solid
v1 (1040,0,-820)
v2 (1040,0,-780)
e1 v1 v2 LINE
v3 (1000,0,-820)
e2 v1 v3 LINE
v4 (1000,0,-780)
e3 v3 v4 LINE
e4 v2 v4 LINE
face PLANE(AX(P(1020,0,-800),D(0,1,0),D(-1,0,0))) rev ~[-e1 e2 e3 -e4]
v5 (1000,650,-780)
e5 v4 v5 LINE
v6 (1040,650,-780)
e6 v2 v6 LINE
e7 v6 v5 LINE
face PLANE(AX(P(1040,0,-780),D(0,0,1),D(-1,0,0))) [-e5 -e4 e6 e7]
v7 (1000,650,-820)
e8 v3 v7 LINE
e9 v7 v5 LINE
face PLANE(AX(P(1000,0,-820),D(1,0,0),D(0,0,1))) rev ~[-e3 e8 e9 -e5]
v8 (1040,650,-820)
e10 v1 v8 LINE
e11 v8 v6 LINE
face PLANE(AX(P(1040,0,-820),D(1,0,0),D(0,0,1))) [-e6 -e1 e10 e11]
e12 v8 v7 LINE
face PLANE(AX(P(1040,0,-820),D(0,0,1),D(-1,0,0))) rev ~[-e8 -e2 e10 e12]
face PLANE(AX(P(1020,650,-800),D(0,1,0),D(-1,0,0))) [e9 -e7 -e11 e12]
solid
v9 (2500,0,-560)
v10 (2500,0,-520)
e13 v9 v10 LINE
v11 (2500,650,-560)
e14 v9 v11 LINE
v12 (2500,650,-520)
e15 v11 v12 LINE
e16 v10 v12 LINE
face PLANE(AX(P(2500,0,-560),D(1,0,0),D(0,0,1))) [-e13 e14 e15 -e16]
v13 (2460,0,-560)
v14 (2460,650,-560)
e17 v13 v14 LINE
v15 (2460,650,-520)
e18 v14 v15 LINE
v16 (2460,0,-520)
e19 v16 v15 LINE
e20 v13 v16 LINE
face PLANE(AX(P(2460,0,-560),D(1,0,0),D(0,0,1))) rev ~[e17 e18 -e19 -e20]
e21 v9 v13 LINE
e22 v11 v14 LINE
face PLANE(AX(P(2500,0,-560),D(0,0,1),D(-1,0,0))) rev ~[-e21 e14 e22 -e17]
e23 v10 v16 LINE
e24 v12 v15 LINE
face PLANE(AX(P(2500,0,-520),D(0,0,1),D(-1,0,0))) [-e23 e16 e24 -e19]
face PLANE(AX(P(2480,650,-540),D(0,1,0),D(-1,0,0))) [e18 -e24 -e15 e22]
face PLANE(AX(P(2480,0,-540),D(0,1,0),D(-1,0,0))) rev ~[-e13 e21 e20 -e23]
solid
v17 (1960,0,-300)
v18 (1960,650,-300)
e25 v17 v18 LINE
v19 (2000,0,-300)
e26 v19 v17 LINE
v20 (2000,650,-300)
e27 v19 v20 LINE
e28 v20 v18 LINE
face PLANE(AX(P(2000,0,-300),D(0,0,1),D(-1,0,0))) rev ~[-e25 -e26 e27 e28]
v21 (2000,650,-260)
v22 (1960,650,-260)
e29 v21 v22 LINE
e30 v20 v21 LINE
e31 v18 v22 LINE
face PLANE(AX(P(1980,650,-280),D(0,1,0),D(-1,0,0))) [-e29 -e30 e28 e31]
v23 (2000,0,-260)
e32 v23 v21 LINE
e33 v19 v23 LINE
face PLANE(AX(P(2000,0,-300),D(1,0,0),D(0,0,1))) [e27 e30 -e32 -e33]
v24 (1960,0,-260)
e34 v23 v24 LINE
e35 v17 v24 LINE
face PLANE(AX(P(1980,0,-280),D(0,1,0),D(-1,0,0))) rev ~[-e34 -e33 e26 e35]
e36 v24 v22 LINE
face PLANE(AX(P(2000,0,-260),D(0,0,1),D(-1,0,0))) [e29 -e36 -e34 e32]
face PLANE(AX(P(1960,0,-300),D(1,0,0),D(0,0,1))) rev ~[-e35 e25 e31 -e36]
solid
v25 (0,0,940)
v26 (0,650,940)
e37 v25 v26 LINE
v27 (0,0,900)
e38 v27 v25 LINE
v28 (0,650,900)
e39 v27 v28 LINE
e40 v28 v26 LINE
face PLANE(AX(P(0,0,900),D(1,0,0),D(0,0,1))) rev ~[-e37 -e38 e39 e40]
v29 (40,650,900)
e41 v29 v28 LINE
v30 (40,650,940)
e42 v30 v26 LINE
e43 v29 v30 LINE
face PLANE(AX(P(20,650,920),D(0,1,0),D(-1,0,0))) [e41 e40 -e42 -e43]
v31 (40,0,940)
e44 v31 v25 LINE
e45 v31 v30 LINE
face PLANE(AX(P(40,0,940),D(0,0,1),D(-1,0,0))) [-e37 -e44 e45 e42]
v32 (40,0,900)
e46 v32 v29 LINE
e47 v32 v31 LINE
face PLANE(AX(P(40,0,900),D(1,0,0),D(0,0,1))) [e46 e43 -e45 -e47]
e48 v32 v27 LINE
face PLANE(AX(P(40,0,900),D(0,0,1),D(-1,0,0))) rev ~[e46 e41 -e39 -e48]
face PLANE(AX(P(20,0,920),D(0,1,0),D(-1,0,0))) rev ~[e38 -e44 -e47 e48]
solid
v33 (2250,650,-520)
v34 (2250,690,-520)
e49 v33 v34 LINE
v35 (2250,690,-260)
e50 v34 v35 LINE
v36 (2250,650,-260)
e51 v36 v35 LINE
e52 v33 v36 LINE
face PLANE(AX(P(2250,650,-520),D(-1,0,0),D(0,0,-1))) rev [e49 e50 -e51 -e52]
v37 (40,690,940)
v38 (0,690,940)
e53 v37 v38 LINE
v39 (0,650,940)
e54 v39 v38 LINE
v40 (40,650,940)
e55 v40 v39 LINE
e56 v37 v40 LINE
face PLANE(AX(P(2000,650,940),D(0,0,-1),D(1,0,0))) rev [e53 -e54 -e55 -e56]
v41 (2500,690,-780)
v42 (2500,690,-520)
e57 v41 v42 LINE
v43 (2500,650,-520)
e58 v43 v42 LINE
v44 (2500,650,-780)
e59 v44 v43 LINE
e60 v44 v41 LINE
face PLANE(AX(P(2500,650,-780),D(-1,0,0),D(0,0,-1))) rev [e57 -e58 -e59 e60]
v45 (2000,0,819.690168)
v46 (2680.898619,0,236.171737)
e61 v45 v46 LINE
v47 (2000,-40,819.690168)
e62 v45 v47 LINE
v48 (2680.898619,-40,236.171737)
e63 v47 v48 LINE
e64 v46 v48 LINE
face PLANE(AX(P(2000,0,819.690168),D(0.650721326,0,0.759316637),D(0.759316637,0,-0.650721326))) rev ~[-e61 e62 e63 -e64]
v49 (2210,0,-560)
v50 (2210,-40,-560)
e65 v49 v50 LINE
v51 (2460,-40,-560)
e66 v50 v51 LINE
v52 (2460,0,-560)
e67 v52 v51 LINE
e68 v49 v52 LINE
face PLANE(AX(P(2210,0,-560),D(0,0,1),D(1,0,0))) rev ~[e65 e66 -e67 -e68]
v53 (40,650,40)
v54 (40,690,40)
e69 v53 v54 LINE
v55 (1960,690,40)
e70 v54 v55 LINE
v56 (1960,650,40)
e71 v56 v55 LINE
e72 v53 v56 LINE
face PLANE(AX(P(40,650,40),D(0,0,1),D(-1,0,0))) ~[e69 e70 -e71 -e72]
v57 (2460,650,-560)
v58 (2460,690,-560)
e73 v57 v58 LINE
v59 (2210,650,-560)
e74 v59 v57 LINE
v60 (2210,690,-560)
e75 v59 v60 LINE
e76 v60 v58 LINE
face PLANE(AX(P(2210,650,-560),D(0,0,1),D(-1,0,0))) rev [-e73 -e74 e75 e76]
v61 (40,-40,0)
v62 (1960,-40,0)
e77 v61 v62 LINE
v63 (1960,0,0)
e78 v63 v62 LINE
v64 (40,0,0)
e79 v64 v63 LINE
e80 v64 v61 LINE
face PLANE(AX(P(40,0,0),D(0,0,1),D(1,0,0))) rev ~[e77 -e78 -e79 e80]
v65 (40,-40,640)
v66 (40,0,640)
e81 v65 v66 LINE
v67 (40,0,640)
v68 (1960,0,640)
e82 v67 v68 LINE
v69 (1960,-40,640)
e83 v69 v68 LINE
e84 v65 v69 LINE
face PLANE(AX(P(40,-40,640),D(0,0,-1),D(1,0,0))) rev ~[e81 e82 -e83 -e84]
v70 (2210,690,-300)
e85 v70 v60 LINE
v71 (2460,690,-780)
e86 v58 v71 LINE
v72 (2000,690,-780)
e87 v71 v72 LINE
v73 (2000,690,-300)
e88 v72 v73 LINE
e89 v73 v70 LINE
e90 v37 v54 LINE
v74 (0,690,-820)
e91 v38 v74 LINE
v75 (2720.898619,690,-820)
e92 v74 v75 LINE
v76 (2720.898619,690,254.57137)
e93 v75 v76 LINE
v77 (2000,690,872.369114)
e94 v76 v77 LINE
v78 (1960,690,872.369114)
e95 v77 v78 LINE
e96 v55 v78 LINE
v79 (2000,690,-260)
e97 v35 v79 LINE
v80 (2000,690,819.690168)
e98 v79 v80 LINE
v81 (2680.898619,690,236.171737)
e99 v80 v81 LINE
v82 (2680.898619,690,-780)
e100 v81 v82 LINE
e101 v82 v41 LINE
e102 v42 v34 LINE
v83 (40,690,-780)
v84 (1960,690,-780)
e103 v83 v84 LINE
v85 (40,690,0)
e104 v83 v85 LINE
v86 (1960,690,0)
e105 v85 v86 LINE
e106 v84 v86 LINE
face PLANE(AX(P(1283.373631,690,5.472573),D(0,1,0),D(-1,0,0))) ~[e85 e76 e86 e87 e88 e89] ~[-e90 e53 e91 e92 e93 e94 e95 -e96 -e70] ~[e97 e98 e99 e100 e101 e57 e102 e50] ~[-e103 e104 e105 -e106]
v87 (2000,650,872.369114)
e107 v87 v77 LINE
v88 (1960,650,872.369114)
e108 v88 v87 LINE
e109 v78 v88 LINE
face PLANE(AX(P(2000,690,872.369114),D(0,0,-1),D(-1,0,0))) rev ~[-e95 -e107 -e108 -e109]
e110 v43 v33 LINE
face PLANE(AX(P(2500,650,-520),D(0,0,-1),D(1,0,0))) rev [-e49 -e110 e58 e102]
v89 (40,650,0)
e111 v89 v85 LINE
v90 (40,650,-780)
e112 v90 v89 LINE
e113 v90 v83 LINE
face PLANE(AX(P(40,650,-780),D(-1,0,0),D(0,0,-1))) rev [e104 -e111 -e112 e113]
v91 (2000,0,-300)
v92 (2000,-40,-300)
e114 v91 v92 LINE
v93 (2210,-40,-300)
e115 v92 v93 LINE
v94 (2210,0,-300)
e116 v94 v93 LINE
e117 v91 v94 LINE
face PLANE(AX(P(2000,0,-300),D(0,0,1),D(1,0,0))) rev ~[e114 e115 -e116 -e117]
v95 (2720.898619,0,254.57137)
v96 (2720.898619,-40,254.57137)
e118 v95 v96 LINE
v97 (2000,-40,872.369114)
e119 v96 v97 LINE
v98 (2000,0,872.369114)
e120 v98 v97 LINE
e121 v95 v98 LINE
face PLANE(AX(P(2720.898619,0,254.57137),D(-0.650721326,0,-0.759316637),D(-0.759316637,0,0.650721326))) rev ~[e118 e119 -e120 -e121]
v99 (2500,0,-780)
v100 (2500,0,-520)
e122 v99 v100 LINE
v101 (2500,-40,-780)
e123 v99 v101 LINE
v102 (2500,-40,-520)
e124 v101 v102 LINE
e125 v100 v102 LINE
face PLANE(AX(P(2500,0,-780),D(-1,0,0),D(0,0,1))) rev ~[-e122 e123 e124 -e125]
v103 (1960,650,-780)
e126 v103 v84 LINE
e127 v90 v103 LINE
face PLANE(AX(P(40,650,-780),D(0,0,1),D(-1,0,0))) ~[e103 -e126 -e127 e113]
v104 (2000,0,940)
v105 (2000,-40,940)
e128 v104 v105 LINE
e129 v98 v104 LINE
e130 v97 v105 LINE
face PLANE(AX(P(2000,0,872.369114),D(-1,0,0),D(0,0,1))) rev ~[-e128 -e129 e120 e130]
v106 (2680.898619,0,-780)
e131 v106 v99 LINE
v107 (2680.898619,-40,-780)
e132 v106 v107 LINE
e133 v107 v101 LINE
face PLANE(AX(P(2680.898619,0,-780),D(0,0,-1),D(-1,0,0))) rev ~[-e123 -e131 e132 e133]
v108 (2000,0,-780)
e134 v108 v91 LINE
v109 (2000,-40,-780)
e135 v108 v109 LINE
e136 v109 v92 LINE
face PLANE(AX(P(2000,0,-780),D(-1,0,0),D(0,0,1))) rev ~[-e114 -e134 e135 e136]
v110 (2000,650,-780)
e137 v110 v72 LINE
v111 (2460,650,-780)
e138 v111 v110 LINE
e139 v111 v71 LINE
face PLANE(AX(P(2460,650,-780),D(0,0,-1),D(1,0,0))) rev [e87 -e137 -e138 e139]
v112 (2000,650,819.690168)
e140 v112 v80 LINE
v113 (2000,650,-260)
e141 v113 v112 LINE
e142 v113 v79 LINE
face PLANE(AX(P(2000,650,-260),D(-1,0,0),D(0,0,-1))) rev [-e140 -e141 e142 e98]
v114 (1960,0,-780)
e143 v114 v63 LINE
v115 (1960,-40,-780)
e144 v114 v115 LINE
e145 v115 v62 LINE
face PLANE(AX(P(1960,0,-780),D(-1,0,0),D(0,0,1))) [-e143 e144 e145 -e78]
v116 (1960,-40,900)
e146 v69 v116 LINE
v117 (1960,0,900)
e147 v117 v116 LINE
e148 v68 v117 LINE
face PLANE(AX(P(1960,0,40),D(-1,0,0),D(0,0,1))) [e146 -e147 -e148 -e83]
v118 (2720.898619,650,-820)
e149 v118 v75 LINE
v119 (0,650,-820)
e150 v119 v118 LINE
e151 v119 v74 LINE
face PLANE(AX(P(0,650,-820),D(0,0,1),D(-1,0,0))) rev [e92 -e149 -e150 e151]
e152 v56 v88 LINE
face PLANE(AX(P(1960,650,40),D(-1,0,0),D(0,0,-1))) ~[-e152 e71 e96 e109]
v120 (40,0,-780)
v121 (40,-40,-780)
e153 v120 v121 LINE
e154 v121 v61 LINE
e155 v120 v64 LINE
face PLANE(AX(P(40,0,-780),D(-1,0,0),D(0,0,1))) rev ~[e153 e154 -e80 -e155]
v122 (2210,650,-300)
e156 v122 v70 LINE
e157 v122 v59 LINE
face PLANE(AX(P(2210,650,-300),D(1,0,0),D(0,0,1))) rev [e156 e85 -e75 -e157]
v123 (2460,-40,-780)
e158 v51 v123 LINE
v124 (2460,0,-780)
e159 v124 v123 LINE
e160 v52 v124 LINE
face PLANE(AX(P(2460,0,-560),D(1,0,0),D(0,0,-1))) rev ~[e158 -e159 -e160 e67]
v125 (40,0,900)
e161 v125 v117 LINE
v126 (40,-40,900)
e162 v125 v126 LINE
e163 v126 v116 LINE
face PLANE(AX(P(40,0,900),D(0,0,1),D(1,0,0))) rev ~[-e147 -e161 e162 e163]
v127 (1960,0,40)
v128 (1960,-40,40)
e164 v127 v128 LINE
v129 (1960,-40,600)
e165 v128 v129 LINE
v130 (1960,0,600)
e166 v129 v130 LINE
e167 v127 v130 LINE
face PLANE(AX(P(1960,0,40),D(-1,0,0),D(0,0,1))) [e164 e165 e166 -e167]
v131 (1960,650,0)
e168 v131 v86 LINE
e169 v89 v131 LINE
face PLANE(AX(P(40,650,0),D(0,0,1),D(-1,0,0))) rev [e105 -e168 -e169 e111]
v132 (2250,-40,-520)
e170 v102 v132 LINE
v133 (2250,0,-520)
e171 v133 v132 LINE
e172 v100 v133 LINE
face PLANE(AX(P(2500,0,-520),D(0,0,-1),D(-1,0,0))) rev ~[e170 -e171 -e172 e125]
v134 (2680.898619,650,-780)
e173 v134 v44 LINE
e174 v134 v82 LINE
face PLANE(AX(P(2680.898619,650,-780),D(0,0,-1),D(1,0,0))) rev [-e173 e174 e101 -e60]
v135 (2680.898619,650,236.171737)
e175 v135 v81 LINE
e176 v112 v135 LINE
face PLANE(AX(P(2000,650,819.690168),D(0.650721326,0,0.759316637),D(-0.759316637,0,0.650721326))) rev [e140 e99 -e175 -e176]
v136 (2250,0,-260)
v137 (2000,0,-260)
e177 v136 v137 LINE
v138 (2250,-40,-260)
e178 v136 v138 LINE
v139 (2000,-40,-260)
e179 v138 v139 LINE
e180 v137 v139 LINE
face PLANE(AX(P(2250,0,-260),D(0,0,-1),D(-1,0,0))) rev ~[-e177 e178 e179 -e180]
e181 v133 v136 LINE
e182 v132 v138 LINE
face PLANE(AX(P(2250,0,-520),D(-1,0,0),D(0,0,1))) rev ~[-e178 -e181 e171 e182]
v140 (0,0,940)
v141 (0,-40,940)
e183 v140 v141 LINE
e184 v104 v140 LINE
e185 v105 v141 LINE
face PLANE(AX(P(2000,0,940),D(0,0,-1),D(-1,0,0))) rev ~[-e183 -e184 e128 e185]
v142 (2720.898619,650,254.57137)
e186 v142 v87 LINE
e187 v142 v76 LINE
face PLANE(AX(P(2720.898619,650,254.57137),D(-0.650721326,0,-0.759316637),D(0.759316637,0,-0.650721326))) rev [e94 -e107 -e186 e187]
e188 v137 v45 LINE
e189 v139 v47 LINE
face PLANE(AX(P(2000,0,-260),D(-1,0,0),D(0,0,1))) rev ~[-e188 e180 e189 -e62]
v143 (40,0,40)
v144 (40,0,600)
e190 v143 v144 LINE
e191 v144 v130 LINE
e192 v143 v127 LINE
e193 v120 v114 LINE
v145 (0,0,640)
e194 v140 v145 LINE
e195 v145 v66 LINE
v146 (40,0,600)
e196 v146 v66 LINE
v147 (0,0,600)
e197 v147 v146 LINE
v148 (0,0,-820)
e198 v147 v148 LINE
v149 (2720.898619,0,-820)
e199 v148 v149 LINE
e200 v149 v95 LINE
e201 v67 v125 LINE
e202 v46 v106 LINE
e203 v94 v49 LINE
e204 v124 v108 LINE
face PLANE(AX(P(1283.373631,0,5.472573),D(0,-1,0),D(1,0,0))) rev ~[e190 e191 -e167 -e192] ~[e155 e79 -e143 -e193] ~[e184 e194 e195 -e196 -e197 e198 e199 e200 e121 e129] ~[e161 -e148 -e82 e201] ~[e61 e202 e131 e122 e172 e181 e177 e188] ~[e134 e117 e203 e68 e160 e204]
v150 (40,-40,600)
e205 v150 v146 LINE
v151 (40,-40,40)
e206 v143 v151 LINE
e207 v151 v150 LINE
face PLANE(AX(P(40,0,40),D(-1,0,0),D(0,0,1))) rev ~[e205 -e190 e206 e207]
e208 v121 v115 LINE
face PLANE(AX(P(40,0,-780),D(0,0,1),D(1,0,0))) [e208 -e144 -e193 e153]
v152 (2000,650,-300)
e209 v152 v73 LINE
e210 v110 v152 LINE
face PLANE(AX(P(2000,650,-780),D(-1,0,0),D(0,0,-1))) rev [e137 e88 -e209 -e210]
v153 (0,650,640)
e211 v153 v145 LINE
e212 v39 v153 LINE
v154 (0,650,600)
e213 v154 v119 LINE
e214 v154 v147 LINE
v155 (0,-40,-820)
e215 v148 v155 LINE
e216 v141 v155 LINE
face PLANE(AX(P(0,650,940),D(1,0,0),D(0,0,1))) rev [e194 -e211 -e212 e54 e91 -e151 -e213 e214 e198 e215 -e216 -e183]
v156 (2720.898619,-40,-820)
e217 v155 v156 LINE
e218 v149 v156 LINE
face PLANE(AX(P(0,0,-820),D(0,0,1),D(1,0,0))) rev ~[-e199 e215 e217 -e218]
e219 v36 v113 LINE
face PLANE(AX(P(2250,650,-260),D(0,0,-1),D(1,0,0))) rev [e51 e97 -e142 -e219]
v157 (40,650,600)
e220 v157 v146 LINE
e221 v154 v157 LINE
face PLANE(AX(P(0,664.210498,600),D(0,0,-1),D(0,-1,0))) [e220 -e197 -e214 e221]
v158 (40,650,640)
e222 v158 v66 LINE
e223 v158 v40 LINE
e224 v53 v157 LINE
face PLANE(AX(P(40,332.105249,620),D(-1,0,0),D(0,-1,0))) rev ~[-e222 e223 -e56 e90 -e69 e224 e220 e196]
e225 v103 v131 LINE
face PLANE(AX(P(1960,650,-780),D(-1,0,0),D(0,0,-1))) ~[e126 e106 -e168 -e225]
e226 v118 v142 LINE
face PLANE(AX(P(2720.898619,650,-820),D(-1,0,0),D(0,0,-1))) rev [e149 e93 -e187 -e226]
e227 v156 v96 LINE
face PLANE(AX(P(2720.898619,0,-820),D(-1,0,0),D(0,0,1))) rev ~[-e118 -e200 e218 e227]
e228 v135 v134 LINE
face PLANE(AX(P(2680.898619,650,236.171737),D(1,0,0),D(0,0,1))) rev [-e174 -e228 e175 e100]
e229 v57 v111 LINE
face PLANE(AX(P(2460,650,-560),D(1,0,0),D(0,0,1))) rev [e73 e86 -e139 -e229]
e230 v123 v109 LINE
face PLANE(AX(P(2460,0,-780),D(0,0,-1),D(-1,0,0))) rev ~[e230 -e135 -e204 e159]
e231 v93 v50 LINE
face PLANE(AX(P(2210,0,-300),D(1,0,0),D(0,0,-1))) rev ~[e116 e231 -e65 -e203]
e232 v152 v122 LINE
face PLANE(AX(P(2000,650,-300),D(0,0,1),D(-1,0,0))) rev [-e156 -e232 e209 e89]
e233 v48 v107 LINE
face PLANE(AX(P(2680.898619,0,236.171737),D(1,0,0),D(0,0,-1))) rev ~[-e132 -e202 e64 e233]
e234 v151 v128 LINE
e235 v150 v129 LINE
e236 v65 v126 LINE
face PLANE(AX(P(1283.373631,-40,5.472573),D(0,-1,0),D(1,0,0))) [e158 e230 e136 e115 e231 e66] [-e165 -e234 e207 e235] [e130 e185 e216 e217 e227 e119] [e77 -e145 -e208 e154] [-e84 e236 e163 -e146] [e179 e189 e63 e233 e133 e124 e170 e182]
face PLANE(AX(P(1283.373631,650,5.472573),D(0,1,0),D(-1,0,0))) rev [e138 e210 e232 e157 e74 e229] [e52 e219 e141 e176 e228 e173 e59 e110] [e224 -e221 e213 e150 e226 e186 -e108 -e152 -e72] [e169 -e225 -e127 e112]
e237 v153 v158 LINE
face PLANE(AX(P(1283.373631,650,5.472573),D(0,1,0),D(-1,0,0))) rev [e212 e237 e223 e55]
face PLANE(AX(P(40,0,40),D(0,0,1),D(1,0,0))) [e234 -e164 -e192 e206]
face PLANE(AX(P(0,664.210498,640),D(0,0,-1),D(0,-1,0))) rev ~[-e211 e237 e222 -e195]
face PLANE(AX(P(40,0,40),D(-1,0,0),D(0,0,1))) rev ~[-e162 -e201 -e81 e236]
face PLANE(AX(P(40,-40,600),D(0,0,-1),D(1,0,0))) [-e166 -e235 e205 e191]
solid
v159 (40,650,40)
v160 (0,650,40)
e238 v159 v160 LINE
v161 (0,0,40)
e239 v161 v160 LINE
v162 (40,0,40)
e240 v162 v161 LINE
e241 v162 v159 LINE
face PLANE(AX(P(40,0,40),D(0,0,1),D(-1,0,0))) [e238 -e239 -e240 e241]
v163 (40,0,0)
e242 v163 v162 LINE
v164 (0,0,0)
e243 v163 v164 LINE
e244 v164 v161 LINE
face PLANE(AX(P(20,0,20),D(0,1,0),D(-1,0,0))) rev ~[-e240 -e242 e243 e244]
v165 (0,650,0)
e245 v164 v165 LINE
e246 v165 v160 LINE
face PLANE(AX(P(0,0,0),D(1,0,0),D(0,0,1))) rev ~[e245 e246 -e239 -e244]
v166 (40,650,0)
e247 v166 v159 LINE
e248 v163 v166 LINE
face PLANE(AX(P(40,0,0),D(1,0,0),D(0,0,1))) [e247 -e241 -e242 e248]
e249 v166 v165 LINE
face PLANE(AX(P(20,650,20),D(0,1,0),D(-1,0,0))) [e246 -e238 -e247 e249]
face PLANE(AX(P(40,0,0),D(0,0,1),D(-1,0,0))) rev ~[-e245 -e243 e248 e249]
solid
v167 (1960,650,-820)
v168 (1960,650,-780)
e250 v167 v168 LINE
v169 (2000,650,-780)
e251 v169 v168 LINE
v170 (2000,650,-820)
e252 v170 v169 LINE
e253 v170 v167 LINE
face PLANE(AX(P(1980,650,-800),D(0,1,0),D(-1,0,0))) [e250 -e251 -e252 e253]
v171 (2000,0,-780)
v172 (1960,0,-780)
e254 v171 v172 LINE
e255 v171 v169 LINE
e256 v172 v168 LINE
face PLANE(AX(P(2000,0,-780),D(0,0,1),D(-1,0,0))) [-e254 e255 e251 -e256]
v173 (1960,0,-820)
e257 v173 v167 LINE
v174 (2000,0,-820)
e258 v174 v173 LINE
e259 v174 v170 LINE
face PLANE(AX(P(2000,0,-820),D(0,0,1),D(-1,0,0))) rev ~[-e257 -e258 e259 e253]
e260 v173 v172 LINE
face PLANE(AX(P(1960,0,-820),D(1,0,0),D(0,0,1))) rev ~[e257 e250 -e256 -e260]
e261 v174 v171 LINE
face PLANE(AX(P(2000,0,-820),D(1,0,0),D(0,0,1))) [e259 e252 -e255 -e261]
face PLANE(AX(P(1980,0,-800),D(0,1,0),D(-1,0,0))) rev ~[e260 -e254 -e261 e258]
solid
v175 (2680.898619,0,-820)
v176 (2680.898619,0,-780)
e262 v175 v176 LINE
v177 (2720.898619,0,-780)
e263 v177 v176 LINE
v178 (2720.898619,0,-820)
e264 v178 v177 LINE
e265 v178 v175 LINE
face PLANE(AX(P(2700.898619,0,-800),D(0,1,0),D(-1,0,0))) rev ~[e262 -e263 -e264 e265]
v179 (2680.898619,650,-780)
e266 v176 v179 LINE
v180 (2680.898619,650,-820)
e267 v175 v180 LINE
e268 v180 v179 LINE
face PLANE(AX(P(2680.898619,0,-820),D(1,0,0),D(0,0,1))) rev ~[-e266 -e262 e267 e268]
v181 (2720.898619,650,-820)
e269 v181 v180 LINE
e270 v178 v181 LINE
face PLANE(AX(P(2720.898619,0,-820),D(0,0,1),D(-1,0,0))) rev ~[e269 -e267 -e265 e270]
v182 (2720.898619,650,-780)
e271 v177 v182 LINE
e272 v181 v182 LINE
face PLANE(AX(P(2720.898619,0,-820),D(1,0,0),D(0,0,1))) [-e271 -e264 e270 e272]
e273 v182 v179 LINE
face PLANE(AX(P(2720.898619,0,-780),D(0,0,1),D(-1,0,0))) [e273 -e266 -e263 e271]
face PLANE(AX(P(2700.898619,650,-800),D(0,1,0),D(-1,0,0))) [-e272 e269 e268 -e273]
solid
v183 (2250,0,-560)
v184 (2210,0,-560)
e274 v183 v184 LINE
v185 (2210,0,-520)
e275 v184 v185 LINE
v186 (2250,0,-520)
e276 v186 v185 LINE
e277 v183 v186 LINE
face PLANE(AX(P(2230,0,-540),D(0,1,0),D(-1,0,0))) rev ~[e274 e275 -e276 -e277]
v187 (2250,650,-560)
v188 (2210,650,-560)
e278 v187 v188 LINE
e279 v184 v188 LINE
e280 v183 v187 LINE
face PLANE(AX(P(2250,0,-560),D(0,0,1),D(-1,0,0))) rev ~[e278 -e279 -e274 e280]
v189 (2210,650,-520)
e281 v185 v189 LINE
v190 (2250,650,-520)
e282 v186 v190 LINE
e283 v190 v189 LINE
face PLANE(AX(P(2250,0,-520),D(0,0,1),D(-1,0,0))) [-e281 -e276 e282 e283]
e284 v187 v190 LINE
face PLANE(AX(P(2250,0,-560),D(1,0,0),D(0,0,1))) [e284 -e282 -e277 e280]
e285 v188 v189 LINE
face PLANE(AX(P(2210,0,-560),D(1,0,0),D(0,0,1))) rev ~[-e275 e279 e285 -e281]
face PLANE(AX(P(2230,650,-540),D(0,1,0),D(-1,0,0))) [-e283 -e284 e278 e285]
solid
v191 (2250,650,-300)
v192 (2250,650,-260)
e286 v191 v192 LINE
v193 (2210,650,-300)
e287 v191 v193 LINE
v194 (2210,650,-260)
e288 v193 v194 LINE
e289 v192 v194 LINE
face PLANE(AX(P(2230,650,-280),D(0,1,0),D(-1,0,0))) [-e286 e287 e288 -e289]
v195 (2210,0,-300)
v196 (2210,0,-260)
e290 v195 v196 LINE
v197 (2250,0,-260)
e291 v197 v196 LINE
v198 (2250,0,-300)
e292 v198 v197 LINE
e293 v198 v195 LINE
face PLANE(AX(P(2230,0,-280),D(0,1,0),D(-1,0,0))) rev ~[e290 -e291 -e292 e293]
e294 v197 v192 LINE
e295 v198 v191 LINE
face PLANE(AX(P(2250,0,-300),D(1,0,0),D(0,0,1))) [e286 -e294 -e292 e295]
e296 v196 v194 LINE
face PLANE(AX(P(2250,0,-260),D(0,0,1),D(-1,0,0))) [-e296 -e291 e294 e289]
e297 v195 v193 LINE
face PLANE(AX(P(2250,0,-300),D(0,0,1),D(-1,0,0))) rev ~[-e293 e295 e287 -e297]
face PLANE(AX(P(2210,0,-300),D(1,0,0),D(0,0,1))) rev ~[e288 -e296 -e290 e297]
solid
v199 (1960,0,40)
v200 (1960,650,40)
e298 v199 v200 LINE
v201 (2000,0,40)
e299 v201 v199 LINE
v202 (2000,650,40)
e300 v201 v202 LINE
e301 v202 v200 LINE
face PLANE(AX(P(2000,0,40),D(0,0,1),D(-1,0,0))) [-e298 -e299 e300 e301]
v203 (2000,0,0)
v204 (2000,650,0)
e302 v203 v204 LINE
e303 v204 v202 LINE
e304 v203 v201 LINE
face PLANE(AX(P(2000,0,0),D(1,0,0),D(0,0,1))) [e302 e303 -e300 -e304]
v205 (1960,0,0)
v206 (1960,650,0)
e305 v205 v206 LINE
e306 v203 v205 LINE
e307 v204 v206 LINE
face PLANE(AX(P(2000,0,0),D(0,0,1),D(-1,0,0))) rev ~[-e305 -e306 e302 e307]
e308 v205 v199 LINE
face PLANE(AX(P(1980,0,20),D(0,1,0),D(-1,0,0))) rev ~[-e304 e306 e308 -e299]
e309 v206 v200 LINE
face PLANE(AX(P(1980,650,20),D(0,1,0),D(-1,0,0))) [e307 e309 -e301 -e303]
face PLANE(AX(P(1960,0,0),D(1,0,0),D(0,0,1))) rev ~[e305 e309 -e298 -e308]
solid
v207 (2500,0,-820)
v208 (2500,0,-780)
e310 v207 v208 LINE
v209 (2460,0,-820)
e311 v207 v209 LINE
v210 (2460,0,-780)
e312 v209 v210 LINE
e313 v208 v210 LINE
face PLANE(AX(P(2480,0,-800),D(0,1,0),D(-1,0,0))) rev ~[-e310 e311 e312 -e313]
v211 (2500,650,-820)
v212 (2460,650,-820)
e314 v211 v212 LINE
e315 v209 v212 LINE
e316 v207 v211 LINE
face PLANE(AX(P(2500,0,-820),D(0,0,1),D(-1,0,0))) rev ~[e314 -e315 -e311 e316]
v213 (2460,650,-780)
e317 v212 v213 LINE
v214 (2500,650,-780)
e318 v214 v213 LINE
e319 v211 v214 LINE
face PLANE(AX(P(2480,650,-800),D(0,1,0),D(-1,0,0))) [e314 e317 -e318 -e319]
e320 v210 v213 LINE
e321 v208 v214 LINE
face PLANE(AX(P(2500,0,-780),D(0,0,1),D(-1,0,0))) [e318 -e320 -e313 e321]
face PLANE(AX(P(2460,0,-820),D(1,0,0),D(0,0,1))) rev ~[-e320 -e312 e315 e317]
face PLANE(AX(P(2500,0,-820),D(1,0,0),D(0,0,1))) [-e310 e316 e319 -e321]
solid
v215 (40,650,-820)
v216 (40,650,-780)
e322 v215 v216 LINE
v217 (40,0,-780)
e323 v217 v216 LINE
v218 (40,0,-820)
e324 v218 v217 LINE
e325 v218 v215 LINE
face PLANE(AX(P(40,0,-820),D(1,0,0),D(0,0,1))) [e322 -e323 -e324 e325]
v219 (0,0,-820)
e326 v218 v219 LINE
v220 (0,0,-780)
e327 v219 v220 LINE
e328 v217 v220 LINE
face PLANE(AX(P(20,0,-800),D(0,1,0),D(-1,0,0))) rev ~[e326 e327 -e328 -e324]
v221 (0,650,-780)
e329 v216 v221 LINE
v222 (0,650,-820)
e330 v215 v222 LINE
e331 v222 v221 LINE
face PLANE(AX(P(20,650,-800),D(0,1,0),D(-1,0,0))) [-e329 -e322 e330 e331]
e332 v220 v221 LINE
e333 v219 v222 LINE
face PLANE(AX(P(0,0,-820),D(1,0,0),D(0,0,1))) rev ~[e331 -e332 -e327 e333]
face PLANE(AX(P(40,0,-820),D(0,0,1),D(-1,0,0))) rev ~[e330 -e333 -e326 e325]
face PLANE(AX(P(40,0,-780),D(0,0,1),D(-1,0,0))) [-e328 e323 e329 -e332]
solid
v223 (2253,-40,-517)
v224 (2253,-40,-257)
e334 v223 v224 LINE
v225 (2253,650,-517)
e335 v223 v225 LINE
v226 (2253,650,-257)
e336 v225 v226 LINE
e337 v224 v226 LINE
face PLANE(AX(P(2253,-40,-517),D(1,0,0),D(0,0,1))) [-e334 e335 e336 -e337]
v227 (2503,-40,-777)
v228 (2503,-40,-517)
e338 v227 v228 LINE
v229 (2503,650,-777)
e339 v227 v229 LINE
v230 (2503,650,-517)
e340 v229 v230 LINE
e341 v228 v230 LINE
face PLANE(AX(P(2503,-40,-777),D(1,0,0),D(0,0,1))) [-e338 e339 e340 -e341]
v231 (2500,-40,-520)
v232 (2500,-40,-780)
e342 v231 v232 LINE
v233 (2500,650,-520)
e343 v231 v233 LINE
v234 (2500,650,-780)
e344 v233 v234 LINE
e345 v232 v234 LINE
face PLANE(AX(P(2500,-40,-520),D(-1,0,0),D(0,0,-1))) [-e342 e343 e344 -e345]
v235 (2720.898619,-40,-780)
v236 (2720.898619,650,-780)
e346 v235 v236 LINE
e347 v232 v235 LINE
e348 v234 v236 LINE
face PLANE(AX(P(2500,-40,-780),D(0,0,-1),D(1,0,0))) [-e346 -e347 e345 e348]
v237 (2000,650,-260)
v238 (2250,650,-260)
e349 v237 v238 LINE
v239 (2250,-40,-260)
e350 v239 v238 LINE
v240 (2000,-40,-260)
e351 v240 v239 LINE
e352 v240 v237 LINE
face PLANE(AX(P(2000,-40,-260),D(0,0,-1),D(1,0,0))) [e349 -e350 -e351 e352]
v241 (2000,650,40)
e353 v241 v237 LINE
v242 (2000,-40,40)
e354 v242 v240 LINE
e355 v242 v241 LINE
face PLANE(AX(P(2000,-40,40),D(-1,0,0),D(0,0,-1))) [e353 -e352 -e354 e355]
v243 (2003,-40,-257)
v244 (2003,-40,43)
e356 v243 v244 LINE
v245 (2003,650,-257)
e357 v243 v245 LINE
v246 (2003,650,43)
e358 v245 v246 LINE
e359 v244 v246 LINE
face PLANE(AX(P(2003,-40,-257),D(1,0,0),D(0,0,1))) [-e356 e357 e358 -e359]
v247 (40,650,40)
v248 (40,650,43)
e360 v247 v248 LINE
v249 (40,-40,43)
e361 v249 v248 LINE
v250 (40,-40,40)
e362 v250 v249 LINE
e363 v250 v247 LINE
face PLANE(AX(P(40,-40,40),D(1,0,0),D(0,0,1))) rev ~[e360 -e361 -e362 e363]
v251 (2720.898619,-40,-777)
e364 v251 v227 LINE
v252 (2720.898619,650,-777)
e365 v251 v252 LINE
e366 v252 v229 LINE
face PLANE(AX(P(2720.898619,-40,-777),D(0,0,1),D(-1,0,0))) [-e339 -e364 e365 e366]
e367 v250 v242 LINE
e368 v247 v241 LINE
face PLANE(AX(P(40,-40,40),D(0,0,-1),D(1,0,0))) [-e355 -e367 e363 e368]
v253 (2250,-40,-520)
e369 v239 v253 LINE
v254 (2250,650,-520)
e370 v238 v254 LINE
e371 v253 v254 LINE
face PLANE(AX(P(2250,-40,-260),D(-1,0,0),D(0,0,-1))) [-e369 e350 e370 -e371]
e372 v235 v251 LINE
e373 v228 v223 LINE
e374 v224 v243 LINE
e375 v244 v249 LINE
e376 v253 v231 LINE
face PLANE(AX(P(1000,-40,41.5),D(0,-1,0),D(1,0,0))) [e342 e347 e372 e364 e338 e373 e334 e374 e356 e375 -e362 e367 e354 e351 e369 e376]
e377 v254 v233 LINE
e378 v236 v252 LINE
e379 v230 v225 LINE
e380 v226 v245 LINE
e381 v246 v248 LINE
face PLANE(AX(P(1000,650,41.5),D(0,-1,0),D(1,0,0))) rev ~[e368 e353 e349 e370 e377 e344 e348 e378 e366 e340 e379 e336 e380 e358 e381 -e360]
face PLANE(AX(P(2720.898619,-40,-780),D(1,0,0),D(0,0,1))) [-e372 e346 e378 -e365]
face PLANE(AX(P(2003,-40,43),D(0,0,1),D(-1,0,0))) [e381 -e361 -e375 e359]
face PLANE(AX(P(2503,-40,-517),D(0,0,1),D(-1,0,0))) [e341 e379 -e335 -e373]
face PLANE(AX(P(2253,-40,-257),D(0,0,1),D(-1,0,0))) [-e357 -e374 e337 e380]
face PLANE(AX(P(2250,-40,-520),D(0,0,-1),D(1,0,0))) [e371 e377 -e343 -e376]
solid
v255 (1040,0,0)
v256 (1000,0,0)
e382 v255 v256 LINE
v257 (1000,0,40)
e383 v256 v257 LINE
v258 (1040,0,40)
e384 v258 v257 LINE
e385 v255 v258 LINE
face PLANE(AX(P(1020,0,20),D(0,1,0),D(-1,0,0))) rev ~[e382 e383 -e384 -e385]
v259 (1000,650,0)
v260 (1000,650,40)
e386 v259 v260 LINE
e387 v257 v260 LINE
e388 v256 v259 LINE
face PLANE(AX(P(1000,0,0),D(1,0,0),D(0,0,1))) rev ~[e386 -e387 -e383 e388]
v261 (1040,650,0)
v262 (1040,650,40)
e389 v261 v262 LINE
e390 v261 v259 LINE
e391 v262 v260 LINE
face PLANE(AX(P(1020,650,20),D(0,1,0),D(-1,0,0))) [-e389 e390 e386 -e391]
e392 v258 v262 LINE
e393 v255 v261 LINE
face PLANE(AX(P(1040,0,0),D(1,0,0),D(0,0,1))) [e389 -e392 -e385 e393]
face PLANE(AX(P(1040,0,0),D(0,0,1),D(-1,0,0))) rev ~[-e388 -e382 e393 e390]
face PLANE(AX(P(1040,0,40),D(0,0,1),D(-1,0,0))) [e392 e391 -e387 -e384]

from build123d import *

# Parameters (mm, degrees)
F0_W      = 1920
F0_H      = 780
F0_H_2    = 860
F1_DEPTH  = 40
F2_W      = 40
F2_H      = 40
F3_DEPTH  = 650
F6_W      = 1920
F6_H      = 3
F6_W_2    = 40
F7_DEPTH  = 690
F9_DEPTH  = 760
F10_W     = 1920
F10_H     = 40
F11_DEPTH = 40
F12_W     = 664.210498333
F12_H     = 40
F13_DEPTH = 40


with BuildPart() as f1:
    # F0 (on Front) → F1 (new body)
    with BuildSketch(Plane.XZ):
        Polygon((0, -820), (2000, -820), (2720.8986186981, -820), (2720.8986186981, 254.5713696399), (2000, 872.3691137475), (2000, 940), (0, 940), (0, 40), (0, 0), align=None)
        with Locations((1000, -390)):
            Rectangle(F0_W, F0_H, mode=Mode.SUBTRACT)
        Polygon((2460, -780), (2000, -780), (2000, -300), (2210, -300), (2210, -560), (2460, -560), align=None, mode=Mode.SUBTRACT)
        Polygon((2000, 0), (2000, 40), (2000, 819.6901679039), (2680.8986186981, 236.1717373133), (2680.8986186981, -780), (2500, -780), (2500, -520), (2250, -520), (2250, -260), (2000, -260), align=None, mode=Mode.SUBTRACT)
        with Locations((1000, 470)):
            Rectangle(F0_W, F0_H_2, mode=Mode.SUBTRACT)
    extrude(amount=F1_DEPTH)


with BuildPart() as f3:
    # F2 (on face) → F3 (new body)
    with BuildSketch(Plane(origin=(0, 0, 0), x_dir=(-1, 0, 0), z_dir=(0, 1, 0))):
        with Locations((-20, 920)):
            Rectangle(F2_W, F2_H)
    extrude(amount=F3_DEPTH)


with BuildPart() as f3b:
    # F2 (on face) → F3, piece 2 (new body)
    with BuildSketch(Plane(origin=(0, 0, 0), x_dir=(-1, 0, 0), z_dir=(0, 1, 0))):
        with Locations((-20, 20)):
            Rectangle(F2_W, F2_H)
    extrude(amount=F3_DEPTH)


with BuildPart() as f3c:
    # F2 (on face) → F3, piece 3 (new body)
    with BuildSketch(Plane(origin=(0, 0, 0), x_dir=(-1, 0, 0), z_dir=(0, 1, 0))):
        with Locations((-20, -800)):
            Rectangle(F2_W, F2_H)
    extrude(amount=F3_DEPTH)


with BuildPart() as f3d:
    # F2 (on face) → F3, piece 4 (new body)
    with BuildSketch(Plane(origin=(0, 0, 0), x_dir=(-1, 0, 0), z_dir=(0, 1, 0))):
        with Locations((-1020, -800)):
            Rectangle(F2_W, F2_H)
    extrude(amount=F3_DEPTH)


with BuildPart() as f3e:
    # F2 (on face) → F3, piece 5 (new body)
    with BuildSketch(Plane(origin=(0, 0, 0), x_dir=(-1, 0, 0), z_dir=(0, 1, 0))):
        with Locations((-1020, 20)):
            Rectangle(F2_W, F2_H)
    extrude(amount=F3_DEPTH)


with BuildPart() as f3f:
    # F2 (on face) → F3, piece 6 (new body)
    with BuildSketch(Plane(origin=(0, 0, 0), x_dir=(-1, 0, 0), z_dir=(0, 1, 0))):
        with Locations((-1980, 20)):
            Rectangle(F2_W, F2_H)
    extrude(amount=F3_DEPTH)


with BuildPart() as f3g:
    # F2 (on face) → F3, piece 7 (new body)
    with BuildSketch(Plane(origin=(0, 0, 0), x_dir=(-1, 0, 0), z_dir=(0, 1, 0))):
        with Locations((-1980, -800)):
            Rectangle(F2_W, F2_H)
    extrude(amount=F3_DEPTH)


with BuildPart() as f3h:
    # F2 (on face) → F3, piece 8 (new body)
    with BuildSketch(Plane(origin=(0, 0, 0), x_dir=(-1, 0, 0), z_dir=(0, 1, 0))):
        with Locations((-1980, -280)):
            Rectangle(F2_W, F2_H)
    extrude(amount=F3_DEPTH)


with BuildPart() as f3i:
    # F2 (on face) → F3, piece 9 (new body)
    with BuildSketch(Plane(origin=(0, 0, 0), x_dir=(-1, 0, 0), z_dir=(0, 1, 0))):
        with Locations((-2230, -280)):
            Rectangle(F2_W, F2_H)
    extrude(amount=F3_DEPTH)


with BuildPart() as f3j:
    # F2 (on face) → F3, piece 10 (new body)
    with BuildSketch(Plane(origin=(0, 0, 0), x_dir=(-1, 0, 0), z_dir=(0, 1, 0))):
        with Locations((-2480, -540)):
            Rectangle(F2_W, F2_H)
    extrude(amount=F3_DEPTH)


with BuildPart() as f3k:
    # F2 (on face) → F3, piece 11 (new body)
    with BuildSketch(Plane(origin=(0, 0, 0), x_dir=(-1, 0, 0), z_dir=(0, 1, 0))):
        with Locations((-2230, -540)):
            Rectangle(F2_W, F2_H)
    extrude(amount=F3_DEPTH)


with BuildPart() as f3l:
    # F2 (on face) → F3, piece 12 (new body)
    with BuildSketch(Plane(origin=(0, 0, 0), x_dir=(-1, 0, 0), z_dir=(0, 1, 0))):
        with Locations((-2480, -800)):
            Rectangle(F2_W, F2_H)
    extrude(amount=F3_DEPTH)


with BuildPart() as f3m:
    # F2 (on face) → F3, piece 13 (new body)
    with BuildSketch(Plane(origin=(0, 0, 0), x_dir=(-1, 0, 0), z_dir=(0, 1, 0))):
        with Locations((-2700.8986186981, -800)):
            Rectangle(F2_W, F2_H)
    extrude(amount=F3_DEPTH)


with BuildPart() as f5_1:
    # F5: instance of F1
    add(f1.part.mirror(Plane(origin=(1405.4269340263, 325, -25.6106012705), x_dir=(1, 0, 0), z_dir=(0, 1, 0))))

    # F8 (on face) → F9 (cut)
    with BuildSketch(Plane(origin=(0, 690, 0), x_dir=(-1, 0, 0), z_dir=(0, 1, 0))):
        Polygon((-40, 940), (-2000, 940), (-2000, 872.3691137475), (-1960, 872.3691137475), (-1960, 900), (-40, 900), align=None)
    extrude(amount=-F9_DEPTH, mode=Mode.SUBTRACT)


with BuildPart() as f7:
    # F6 (on face) → F7 (new body)
    with BuildSketch(Plane.XZ.offset(40)):
        with Locations((1000, 41.5)):
            Rectangle(F6_W, F6_H)
        with Locations((1980, 41.5)):
            Rectangle(F6_W_2, F6_H)
        Polygon((2000, 43), (2000, 40), (2000, -260), (2250, -260), (2250, -520), (2500, -520), (2500, -780), (2680.8986186981, -780), (2680.8986186981, -777), (2503, -777), (2503, -517), (2253, -517), (2253, -257), (2003, -257), (2003, 43), align=None)
        with Locations((2700.8986186981, -778.5)):
            Rectangle(F6_W_2, F6_H)
    extrude(amount=-F7_DEPTH)


with BuildPart() as f1_1:
    add(f1.part)

    # F10 (on face) → F11 (join)
    with BuildSketch(Plane.XZ.offset(40)):
        with Locations((1000, 620)):
            Rectangle(F10_W, F10_H)
    extrude(amount=-F11_DEPTH)

    add(f5_1.part)  # F13 merges F5_1
    # F12 (on face) → F13 (join)
    with BuildSketch(Plane(origin=(0, 0, 0), x_dir=(0, -1, 0), z_dir=(-1, 0, 0))):
        with Locations((-332.1052491665, 620)):
            Rectangle(F12_W, F12_H)
    extrude(amount=-F13_DEPTH)


solid = Compound([f3.part, f3b.part, f3c.part, f3d.part, f3e.part, f3f.part, f3g.part, f3h.part, f3i.part, f3j.part, f3k.part, f3l.part, f3m.part, f7.part, f1_1.part])
